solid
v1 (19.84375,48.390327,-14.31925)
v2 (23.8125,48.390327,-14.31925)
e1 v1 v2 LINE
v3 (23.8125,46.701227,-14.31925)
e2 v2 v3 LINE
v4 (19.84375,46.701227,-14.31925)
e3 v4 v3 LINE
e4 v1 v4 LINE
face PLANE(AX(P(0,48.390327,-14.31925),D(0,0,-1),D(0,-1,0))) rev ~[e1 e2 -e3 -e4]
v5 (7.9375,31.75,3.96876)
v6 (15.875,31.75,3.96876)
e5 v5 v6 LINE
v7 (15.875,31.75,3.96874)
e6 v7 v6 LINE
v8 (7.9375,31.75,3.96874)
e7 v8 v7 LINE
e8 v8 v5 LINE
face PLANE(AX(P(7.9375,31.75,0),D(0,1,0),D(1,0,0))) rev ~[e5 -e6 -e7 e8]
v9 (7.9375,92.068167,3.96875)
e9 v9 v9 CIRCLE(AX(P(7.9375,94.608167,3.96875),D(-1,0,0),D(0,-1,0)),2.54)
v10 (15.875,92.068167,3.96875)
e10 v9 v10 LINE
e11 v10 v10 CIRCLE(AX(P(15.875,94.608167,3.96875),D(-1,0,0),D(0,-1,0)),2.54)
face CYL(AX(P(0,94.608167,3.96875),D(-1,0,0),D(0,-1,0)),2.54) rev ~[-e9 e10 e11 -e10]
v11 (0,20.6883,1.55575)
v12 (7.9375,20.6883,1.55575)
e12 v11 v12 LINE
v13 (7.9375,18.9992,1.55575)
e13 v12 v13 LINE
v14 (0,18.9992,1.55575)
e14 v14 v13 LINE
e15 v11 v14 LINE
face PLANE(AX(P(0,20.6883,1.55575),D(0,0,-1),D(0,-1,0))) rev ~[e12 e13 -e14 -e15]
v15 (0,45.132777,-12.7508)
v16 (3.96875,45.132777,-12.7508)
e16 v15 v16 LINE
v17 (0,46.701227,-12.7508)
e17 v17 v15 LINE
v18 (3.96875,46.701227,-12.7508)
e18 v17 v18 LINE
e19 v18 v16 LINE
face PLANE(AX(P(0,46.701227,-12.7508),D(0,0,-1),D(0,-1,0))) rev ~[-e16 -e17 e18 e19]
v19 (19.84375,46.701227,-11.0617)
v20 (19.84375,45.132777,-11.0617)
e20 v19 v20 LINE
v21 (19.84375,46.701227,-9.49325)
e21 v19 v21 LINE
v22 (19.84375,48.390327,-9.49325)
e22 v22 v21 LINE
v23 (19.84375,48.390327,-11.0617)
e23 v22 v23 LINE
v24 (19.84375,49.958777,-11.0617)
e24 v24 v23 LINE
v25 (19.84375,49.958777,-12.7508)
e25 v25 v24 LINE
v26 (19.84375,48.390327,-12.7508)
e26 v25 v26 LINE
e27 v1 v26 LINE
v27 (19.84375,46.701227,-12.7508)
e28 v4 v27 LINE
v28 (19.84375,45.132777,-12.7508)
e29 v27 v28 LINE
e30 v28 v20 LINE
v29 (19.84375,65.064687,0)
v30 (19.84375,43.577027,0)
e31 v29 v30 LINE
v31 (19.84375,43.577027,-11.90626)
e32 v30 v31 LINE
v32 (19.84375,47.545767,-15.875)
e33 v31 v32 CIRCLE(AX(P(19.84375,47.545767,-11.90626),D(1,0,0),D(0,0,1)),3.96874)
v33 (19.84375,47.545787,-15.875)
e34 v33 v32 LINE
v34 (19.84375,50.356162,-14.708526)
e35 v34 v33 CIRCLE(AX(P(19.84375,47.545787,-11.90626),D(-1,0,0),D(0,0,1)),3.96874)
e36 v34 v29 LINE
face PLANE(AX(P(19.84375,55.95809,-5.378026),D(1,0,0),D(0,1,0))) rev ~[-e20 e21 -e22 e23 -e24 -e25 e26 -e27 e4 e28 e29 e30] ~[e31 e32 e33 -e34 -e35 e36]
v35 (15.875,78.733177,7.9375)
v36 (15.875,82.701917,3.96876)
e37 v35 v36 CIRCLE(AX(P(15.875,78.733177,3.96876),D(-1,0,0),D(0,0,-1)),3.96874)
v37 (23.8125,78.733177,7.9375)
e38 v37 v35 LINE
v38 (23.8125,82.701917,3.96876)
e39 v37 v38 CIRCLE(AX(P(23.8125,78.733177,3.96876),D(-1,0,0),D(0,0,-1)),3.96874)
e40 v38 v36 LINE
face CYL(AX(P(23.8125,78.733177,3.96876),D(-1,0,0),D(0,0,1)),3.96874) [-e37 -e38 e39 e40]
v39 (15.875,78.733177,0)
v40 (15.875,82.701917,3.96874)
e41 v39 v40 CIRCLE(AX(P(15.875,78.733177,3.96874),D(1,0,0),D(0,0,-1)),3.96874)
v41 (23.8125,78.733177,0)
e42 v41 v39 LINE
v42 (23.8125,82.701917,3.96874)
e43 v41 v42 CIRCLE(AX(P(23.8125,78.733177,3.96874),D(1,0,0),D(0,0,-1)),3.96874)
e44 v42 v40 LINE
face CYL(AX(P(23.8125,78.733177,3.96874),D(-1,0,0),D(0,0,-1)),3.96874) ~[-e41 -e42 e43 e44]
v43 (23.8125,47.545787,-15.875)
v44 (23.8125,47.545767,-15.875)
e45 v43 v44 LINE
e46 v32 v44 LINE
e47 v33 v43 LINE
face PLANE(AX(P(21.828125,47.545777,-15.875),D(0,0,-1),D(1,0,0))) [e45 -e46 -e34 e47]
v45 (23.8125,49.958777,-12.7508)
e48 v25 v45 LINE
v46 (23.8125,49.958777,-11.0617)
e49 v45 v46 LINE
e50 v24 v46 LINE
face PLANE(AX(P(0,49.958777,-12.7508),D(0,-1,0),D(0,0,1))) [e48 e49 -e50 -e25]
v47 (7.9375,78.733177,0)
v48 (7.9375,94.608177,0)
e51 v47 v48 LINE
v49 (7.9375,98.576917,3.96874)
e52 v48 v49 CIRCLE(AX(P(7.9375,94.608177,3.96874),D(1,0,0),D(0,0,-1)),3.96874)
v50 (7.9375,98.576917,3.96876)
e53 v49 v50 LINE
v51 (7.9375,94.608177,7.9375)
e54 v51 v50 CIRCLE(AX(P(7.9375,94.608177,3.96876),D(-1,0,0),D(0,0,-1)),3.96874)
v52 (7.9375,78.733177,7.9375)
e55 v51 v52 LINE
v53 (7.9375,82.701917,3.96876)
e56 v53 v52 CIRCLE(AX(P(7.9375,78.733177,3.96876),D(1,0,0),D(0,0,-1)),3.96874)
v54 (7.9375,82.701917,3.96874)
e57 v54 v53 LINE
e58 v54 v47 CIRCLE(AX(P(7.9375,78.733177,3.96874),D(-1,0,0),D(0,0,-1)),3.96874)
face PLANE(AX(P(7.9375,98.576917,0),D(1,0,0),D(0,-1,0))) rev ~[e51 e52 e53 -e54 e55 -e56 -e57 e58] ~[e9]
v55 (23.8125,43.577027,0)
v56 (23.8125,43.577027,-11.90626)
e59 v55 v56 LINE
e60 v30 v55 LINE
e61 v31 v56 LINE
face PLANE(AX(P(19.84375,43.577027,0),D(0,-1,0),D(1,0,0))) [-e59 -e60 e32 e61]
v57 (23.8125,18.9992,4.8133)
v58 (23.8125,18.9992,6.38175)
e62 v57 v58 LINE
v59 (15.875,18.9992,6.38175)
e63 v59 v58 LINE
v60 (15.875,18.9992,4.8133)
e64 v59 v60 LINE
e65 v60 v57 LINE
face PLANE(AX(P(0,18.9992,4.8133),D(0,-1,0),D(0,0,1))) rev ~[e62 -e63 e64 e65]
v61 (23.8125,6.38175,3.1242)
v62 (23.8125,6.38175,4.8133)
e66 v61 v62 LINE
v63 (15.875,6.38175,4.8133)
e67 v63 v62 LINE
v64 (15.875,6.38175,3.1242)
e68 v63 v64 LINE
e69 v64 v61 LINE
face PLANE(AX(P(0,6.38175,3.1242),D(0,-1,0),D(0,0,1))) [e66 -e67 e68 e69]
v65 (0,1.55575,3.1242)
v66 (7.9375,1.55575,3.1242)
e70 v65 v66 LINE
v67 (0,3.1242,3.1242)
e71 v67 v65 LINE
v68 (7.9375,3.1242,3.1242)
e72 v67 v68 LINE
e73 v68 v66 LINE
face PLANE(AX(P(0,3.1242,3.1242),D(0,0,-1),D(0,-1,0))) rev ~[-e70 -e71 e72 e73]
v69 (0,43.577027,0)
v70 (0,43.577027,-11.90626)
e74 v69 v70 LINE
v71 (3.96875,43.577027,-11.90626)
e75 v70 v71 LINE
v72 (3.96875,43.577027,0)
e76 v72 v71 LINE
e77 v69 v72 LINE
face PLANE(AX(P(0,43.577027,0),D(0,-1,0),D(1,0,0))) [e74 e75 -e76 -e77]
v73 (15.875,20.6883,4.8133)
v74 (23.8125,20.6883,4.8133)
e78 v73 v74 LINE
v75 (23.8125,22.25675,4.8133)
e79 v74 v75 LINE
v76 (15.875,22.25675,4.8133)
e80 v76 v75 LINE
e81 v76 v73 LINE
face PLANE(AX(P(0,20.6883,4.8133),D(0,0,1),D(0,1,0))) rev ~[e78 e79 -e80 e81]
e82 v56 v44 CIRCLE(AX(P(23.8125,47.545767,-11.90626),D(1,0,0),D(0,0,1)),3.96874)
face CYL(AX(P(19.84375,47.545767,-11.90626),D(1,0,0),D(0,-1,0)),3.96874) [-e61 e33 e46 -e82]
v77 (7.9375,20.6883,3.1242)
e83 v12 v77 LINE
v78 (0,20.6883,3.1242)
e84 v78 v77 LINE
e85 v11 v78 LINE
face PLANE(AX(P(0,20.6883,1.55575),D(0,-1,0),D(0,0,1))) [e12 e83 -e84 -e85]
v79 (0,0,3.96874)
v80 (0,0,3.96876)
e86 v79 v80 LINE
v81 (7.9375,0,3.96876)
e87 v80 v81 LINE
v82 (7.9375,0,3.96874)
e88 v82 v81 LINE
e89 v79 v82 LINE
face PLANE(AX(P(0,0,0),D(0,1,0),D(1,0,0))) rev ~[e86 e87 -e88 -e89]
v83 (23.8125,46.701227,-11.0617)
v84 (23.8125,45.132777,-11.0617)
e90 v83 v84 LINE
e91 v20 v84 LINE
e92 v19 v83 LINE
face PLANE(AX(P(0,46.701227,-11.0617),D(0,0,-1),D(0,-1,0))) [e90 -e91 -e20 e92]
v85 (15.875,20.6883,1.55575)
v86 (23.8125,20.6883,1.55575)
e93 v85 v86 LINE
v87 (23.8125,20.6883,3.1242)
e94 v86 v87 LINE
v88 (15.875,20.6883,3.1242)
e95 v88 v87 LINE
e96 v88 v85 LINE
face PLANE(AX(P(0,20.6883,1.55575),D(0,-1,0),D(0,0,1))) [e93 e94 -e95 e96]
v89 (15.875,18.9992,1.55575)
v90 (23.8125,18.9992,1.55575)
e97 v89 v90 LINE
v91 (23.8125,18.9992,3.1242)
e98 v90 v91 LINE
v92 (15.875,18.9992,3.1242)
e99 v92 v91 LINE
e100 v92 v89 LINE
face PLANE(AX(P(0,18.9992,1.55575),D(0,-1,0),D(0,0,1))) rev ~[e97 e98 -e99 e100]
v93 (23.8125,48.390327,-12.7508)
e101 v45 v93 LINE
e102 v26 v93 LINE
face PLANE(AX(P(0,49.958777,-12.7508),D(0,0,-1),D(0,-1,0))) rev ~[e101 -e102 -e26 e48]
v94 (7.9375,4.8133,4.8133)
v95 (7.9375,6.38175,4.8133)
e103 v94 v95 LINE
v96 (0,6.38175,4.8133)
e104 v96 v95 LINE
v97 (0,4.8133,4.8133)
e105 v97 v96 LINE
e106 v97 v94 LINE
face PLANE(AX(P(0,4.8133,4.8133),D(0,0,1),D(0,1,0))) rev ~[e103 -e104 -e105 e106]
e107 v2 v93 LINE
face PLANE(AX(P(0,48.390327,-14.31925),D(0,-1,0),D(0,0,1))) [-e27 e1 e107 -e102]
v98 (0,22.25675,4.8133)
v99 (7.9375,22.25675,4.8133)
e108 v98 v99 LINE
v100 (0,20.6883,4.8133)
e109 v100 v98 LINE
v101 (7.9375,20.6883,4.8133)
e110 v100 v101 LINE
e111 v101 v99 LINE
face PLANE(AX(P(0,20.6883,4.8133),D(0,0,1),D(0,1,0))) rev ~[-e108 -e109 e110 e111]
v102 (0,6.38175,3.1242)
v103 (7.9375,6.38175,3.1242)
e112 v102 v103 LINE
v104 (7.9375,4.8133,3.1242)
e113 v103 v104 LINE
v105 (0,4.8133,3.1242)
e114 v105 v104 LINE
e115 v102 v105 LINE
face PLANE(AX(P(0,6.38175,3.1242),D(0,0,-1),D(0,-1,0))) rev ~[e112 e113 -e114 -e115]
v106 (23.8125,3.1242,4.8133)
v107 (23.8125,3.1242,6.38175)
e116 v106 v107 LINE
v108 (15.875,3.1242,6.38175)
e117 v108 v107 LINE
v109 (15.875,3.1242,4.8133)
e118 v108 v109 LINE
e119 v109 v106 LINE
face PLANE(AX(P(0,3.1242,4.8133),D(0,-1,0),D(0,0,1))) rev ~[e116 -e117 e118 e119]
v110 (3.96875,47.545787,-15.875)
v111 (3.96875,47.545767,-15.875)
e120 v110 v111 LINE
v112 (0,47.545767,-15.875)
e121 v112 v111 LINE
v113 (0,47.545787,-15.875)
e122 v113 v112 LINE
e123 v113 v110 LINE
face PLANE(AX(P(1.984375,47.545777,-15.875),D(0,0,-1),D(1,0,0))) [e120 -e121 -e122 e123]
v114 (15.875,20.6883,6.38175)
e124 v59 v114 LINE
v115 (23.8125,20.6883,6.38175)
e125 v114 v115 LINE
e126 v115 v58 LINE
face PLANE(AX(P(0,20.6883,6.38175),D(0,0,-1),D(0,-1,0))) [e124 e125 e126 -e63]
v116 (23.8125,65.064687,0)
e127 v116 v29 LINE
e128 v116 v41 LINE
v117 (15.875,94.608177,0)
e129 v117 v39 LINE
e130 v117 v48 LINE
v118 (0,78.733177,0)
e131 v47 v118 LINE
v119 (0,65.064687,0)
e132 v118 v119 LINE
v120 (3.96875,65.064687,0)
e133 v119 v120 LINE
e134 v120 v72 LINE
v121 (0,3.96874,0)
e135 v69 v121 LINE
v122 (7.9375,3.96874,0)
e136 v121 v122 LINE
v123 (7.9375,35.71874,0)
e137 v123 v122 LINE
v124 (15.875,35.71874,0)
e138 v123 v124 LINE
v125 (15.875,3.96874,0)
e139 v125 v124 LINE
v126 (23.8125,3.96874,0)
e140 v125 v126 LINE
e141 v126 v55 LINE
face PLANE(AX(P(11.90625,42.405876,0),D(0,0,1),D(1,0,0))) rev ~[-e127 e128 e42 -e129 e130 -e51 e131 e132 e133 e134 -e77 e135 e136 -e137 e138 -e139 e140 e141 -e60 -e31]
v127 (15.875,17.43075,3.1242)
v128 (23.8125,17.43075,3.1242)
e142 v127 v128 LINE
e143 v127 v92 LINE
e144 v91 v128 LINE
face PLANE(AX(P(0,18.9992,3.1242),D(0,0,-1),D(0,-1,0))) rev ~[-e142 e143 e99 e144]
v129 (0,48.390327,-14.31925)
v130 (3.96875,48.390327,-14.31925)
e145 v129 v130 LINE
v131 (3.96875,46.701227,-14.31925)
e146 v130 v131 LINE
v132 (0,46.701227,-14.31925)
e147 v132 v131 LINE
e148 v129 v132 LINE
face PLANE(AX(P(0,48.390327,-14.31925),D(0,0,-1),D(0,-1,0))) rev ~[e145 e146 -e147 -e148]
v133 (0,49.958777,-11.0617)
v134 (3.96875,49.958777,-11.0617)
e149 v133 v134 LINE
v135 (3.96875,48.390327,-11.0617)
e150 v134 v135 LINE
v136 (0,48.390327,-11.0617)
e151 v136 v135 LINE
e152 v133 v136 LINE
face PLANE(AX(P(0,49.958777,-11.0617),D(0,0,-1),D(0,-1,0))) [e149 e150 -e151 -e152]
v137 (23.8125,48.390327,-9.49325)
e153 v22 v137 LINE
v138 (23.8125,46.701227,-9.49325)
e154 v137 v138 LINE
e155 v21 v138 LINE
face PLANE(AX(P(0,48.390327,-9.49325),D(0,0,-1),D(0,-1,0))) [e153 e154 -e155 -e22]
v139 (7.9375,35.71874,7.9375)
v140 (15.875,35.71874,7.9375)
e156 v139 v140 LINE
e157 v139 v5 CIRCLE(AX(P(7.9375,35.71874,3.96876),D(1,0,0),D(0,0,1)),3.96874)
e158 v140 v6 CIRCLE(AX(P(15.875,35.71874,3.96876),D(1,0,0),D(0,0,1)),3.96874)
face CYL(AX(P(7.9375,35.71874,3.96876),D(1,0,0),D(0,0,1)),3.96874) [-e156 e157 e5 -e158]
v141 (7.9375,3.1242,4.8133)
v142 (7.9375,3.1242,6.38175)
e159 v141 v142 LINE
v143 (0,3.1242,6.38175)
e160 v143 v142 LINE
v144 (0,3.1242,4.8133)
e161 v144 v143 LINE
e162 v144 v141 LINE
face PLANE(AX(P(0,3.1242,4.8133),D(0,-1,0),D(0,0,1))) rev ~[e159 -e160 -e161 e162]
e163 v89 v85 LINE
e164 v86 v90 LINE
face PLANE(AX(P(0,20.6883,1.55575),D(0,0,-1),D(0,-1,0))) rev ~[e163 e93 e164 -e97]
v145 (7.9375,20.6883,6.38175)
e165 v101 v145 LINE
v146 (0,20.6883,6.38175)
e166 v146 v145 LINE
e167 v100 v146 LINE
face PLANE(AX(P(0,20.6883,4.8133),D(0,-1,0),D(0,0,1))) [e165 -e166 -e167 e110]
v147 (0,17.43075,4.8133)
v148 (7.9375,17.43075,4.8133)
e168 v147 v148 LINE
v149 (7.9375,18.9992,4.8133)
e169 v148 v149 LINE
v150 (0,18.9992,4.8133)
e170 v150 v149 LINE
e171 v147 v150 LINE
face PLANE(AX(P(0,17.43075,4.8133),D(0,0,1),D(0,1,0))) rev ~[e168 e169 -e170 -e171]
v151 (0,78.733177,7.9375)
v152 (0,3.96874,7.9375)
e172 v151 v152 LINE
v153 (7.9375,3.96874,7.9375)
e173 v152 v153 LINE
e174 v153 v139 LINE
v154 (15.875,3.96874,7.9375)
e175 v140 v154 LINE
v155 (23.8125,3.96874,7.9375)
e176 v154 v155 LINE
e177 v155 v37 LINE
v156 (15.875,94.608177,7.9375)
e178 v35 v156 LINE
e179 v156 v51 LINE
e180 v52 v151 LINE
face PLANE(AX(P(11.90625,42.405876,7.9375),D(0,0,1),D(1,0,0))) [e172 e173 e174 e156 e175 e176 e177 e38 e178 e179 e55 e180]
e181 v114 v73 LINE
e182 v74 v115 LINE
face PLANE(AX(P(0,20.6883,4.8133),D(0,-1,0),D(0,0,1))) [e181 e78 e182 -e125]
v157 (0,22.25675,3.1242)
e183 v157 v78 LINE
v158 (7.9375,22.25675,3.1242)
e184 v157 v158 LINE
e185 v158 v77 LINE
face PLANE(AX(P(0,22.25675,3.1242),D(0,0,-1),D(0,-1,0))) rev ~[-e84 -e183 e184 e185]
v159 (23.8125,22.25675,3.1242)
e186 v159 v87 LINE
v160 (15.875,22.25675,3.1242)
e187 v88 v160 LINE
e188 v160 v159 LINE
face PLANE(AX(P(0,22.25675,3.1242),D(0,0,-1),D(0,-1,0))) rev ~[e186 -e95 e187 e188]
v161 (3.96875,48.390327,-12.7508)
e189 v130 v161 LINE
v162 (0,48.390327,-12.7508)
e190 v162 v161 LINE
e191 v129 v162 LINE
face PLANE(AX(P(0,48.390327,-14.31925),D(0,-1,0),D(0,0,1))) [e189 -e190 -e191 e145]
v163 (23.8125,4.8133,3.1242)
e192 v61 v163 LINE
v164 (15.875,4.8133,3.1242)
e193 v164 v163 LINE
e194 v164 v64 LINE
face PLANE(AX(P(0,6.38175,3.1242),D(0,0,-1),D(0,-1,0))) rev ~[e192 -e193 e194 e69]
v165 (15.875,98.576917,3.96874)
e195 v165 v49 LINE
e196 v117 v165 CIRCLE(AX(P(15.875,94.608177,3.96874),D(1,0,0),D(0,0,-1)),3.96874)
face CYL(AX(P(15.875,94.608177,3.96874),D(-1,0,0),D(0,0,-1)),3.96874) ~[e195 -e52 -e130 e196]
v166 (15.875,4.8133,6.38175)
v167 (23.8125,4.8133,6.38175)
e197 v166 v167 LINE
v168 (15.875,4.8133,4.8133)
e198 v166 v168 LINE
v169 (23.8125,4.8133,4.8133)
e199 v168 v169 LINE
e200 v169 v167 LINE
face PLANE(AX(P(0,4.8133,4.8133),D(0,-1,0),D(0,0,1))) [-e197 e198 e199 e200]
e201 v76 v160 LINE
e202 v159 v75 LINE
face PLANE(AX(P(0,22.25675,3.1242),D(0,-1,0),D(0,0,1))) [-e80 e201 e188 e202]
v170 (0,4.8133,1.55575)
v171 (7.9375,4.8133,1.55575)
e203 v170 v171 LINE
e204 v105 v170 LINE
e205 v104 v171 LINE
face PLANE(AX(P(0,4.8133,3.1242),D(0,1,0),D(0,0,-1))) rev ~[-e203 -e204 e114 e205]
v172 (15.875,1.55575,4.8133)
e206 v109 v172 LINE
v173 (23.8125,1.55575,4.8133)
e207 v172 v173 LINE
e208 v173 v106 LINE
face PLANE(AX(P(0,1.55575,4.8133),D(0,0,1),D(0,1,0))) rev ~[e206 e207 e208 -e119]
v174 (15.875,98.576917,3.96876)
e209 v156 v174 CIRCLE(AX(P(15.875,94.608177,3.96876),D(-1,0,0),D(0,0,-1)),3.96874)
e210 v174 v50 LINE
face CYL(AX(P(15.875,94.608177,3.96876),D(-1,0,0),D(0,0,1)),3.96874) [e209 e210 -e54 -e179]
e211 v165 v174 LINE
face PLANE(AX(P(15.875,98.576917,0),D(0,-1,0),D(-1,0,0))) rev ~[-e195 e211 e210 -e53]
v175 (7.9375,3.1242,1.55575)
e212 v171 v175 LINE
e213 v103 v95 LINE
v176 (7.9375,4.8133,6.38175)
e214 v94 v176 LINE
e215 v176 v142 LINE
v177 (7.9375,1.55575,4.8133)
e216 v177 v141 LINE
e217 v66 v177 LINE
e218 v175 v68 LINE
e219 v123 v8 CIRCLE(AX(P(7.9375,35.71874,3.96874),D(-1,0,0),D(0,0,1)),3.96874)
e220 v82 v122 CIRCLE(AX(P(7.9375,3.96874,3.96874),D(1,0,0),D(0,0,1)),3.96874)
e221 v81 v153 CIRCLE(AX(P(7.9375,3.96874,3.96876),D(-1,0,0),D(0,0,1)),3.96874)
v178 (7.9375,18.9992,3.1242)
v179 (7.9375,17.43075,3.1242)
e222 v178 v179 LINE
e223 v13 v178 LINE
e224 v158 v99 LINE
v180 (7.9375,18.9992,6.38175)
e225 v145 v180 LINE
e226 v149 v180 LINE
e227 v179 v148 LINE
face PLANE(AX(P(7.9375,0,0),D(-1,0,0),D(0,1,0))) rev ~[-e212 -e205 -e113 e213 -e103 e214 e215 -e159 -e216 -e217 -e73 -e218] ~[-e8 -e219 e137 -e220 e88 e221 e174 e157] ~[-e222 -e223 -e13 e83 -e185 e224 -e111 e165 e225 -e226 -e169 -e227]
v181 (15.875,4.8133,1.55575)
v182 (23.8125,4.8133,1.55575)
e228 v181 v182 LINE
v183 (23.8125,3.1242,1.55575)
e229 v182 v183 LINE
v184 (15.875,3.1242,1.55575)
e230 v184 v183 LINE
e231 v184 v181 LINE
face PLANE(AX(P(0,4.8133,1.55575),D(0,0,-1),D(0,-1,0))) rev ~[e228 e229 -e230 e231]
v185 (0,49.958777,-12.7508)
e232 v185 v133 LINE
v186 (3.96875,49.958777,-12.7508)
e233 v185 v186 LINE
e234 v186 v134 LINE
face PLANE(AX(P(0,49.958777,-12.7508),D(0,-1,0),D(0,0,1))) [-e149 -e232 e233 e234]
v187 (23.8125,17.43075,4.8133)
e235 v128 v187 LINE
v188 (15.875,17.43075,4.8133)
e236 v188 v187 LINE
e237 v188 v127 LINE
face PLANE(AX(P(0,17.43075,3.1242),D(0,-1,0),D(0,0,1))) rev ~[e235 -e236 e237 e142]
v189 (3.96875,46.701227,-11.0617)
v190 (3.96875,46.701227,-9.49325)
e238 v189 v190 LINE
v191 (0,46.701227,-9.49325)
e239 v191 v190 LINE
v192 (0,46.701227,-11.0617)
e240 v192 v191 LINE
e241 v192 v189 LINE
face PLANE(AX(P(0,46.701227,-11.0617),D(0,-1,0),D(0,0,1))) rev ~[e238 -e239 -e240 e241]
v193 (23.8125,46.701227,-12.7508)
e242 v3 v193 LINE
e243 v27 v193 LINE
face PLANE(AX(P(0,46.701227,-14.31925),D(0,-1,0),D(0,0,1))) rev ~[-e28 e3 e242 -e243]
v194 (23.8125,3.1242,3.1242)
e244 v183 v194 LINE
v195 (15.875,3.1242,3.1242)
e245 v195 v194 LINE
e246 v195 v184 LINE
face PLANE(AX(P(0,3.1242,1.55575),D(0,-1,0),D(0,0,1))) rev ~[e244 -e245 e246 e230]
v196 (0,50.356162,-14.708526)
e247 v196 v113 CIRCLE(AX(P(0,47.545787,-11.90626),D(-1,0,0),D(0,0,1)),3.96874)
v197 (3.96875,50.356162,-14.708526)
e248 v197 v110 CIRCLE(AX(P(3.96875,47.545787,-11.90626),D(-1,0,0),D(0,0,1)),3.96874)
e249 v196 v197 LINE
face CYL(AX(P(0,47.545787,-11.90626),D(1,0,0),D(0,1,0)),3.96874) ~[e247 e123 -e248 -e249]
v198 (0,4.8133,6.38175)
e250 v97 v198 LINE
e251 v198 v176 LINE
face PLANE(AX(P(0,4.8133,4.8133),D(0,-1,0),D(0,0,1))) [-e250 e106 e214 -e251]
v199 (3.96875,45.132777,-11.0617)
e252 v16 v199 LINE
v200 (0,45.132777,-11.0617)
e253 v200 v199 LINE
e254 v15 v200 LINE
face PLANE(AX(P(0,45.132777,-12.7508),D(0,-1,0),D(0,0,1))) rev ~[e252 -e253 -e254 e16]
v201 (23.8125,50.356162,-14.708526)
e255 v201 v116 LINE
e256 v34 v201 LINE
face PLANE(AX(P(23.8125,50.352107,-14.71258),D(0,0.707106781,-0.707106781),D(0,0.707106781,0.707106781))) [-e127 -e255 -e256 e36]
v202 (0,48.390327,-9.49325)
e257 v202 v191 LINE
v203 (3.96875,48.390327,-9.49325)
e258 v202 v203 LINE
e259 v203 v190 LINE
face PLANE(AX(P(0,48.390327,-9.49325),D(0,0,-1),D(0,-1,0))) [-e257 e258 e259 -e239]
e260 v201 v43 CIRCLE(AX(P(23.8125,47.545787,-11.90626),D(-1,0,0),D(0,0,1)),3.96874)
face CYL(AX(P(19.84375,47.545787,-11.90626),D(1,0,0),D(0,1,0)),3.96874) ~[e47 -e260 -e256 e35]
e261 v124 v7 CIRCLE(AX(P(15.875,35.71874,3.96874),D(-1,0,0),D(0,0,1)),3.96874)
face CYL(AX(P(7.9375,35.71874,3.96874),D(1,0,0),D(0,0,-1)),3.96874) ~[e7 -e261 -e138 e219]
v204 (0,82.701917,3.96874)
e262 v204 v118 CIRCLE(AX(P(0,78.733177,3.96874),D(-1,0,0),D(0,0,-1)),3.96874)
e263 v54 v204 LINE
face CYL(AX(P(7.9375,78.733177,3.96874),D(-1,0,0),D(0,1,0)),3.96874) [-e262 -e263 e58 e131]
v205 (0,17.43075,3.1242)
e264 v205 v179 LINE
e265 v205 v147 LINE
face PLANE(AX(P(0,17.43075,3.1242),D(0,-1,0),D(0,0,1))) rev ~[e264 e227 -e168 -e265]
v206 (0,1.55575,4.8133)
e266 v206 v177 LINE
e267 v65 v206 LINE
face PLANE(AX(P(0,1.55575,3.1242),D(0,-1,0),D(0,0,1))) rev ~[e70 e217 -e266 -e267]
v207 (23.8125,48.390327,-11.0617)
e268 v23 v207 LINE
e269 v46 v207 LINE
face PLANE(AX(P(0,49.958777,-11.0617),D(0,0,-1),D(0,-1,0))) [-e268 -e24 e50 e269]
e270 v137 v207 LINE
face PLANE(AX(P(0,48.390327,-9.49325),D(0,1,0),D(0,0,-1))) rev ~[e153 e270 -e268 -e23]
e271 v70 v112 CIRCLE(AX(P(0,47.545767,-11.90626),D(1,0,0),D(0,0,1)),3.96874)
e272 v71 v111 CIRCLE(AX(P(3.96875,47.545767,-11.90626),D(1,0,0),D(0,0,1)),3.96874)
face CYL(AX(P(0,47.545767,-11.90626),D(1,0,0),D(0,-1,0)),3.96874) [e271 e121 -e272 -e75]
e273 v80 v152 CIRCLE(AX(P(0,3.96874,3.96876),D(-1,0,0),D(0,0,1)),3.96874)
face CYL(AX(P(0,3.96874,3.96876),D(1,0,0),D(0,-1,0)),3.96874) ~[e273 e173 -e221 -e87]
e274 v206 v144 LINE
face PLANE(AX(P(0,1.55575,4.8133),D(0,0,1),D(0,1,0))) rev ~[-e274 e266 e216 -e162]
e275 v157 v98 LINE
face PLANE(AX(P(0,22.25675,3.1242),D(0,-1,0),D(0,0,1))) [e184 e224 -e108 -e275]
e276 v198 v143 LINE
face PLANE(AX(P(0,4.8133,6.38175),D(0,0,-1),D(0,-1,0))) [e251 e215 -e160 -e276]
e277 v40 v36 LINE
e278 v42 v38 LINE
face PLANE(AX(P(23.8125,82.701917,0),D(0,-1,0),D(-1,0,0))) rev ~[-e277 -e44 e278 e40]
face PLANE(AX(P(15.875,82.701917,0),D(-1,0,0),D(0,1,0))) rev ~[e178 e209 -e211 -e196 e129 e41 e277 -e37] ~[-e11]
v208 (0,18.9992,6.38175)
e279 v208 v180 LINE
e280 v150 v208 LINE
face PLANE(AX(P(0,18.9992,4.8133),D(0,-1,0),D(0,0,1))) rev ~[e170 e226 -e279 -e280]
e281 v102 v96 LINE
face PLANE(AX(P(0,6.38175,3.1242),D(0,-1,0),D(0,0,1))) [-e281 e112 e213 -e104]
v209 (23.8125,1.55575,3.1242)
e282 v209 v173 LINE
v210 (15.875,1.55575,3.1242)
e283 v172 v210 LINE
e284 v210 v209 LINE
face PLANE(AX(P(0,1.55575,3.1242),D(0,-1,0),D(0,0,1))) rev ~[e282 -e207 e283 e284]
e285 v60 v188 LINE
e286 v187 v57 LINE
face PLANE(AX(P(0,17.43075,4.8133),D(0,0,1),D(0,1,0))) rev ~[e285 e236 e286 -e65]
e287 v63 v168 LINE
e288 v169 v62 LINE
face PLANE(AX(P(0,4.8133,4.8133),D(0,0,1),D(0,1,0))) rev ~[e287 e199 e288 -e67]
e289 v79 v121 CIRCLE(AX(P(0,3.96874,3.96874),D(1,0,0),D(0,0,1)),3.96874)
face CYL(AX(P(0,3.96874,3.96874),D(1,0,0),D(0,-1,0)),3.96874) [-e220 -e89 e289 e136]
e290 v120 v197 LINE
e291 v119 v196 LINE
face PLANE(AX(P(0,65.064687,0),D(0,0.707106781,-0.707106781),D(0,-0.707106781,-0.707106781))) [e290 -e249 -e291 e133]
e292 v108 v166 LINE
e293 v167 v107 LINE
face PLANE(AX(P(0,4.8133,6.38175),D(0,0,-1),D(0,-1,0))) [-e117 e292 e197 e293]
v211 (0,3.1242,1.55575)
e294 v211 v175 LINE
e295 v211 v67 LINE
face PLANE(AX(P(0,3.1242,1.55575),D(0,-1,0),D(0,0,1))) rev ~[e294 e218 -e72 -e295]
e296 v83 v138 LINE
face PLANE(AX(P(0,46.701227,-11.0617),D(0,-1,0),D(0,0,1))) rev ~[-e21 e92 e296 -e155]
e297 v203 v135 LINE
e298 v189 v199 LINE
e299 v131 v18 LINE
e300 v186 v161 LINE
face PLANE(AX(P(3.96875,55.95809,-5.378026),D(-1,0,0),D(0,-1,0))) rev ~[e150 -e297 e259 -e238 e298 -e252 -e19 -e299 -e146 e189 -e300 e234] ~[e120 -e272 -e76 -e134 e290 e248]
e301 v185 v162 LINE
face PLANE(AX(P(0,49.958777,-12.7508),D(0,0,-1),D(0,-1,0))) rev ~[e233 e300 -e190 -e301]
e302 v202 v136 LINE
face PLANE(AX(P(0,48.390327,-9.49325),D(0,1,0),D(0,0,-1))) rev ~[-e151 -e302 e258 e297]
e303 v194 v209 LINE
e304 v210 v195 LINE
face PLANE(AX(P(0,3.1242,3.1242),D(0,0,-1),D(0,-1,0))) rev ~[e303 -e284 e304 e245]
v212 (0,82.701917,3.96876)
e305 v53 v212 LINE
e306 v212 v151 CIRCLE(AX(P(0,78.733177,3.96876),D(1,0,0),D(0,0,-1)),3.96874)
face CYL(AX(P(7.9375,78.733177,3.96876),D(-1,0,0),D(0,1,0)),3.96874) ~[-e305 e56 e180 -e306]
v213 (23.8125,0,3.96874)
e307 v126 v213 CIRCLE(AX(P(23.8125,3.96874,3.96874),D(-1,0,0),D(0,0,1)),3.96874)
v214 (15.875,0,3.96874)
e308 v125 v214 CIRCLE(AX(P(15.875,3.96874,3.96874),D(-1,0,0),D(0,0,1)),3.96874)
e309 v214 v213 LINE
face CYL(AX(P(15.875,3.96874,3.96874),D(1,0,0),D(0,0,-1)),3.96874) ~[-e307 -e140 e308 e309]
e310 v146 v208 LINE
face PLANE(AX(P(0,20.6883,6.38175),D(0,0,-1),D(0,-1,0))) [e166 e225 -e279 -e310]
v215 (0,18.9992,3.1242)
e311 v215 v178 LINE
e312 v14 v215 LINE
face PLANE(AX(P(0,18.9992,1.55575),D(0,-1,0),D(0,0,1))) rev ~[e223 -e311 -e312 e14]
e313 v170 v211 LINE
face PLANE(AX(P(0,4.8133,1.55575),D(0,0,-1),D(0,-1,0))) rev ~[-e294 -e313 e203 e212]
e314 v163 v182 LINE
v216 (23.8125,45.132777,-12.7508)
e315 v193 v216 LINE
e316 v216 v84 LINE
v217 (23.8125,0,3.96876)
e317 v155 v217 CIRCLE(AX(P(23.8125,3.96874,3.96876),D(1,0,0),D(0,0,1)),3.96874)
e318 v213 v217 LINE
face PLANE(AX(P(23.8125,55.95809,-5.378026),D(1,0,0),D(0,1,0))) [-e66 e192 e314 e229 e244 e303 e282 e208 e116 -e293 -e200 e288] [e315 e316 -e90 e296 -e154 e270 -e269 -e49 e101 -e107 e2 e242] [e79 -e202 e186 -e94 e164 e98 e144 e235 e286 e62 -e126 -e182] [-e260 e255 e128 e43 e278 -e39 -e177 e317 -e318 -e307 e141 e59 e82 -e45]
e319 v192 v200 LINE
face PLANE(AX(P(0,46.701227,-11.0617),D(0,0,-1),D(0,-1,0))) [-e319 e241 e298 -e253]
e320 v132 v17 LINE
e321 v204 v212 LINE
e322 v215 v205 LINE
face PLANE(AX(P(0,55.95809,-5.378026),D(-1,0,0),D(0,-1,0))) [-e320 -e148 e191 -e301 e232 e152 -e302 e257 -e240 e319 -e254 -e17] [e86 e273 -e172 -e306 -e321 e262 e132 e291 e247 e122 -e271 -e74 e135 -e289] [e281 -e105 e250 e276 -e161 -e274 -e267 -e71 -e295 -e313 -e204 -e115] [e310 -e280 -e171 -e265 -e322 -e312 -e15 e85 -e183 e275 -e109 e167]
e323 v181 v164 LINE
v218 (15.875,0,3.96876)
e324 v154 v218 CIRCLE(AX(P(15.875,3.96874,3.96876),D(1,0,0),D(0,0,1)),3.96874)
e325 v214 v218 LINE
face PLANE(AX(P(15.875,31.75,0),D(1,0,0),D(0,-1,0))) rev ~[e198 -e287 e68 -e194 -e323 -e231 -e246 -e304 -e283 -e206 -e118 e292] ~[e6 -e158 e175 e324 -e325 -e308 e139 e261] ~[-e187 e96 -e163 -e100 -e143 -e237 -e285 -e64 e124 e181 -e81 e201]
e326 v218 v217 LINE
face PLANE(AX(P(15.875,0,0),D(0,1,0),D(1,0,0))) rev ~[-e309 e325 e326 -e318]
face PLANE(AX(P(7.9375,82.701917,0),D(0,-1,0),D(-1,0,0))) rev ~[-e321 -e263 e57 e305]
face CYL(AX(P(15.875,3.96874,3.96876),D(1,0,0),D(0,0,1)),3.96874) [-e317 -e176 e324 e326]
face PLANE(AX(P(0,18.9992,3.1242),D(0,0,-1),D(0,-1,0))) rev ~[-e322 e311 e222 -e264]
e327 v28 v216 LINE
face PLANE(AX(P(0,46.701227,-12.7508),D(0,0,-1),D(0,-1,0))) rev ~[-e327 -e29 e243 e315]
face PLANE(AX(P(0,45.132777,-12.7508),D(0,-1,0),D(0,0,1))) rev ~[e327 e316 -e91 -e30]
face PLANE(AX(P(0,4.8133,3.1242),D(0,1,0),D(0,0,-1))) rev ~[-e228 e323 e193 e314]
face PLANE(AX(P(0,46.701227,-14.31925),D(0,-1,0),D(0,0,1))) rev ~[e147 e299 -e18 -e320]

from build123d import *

# Parameters (mm, degrees)
F1_DEPTH  = 7.9375
F2_W      = 3.96875
F2_H      = 7.9375
F3_DEPTH  = 15.875
F4_R      = 3.96874
F5_W      = 1.56845
F5_H      = 1.6891
F5_W_2    = 1.6891
F5_H_2    = 1.56845
F5_R      = 2.54
F6_DEPTH  = 23.8125
F8_DEPTH  = 3.96875
F10_DEPTH = 3.96875


# Not quite as in the source:
# - a fillet or chamfer is up to 0.001 mm smaller than in the source, because OpenCascade refuses the exact size


with BuildPart() as f1:
    # F0 (on Top) → F1 (new body)
    with BuildSketch(Plane.XY):
        Polygon((0, 82.7019174), (0, 0), (7.9375, 0), (7.9375, 31.75), (15.875, 31.75), (15.875, 0), (23.8125, 0), (23.8125, 82.7019174), (15.875, 82.7019174), (15.875, 98.5769174), (7.9375, 98.5769174), (7.9375, 82.7019174), align=None)
    extrude(amount=F1_DEPTH)

    # F2 (on face) → F3 (join)
    with BuildSketch(Plane(origin=(0, 0, 0), x_dir=(1, 0, 0), z_dir=(0, 0, -1))):
        with Locations((21.828125, -47.5457774)):
            Rectangle(F2_W, F2_H)
        with Locations((1.984375, -47.5457774)):
            Rectangle(F2_W, F2_H)
    extrude(amount=F3_DEPTH)

    # F4 (radius 3.96875 in the source; OpenCascade refuses exactly that, so slightly less here)
    f4_edges = [f1.edges().sort_by_distance(p)[0] for p in [
        (19.84375, 82.701917, 0),
        (19.84375, 82.701917, 7.9375),
        (11.90625, 98.576917, 0),
        (11.90625, 98.576917, 7.9375),
        (3.96875, 82.701917, 0),
        (3.96875, 82.701917, 7.9375),
        (1.984375, 51.514527, -15.875),
        (1.984375, 43.577027, -15.875),
        (21.828125, 51.514527, -15.875),
        (21.828125, 43.577027, -15.875),
        (3.96875, 0, 0),
        (3.96875, 0, 7.9375),
        (19.84375, 0, 7.9375),
        (19.84375, 0, 0),
        (11.90625, 31.75, 7.9375),
        (11.90625, 31.75, 0),
    ]]
    fillet(f4_edges, radius=F4_R)

    # F5 (on face) → F6 (cut, through all)
    with BuildSketch(Plane(origin=(0, 0, 0), x_dir=(0, -1, 0), z_dir=(-1, 0, 0))):
        with Locations((-2.339975, 3.96875)):
            Rectangle(F5_W, F5_H)
        with Locations((-3.96875, 2.339975)):
            Rectangle(F5_W_2, F5_H_2)
        with Locations((-3.96875, 3.96875)):
            Rectangle(F5_W_2, F5_H)
        with Locations((-5.597525, 3.96875)):
            Rectangle(F5_W, F5_H)
        with Locations((-3.96875, 5.597525)):
            Rectangle(F5_W_2, F5_H_2)
        with Locations((-47.5457774, -10.277475)):
            Rectangle(F5_W_2, F5_H_2)
        with Locations((-47.5457774, -11.90625)):
            Rectangle(F5_W_2, F5_H)
        with Locations((-49.1745524, -11.90625)):
            Rectangle(F5_W, F5_H)
        with Locations((-45.9170024, -11.90625)):
            Rectangle(F5_W, F5_H)
        with Locations((-47.5457774, -13.535025)):
            Rectangle(F5_W_2, F5_H_2)
        with Locations((-19.84375, 2.339975)):
            Rectangle(F5_W_2, F5_H_2)
        with Locations((-21.472525, 3.96875)):
            Rectangle(F5_W, F5_H)
        with Locations((-19.84375, 3.96875)):
            Rectangle(F5_W_2, F5_H)
        with Locations((-18.214975, 3.96875)):
            Rectangle(F5_W, F5_H)
        with Locations((-19.84375, 5.597525)):
            Rectangle(F5_W_2, F5_H_2)
        with Locations((-94.6081674, 3.96875)):
            Circle(F5_R)
    extrude(amount=-F6_DEPTH, mode=Mode.SUBTRACT)

    # F7 (on face) → F8 (join, through all)
    with BuildSketch(Plane(origin=(0, 0, 0), x_dir=(0, -1, 0), z_dir=(-1, 0, 0))):
        with BuildLine():
            Line((-65.0646874757, 0), (-50.3521074378, -14.7125800378))
            ThreePointArc((-50.3521074378, -14.7125800378), (-51.2124242947, -13.4250248722), (-51.5145274, -11.90625))
            Line((-51.5145274, -11.90625), (-51.5145274, 0))
            Line((-51.5145274, 0), (-65.0646874757, 0))
        make_face()
    extrude(amount=-F8_DEPTH)

    # F9 (on face) → F10 (join, through all)
    with BuildSketch(Plane.YZ.offset(23.8125)):
        with BuildLine():
            ThreePointArc((51.5145274, -11.90625), (51.2124242947, -13.4250248722), (50.3521074378, -14.7125800378))
            Line((50.3521074378, -14.7125800378), (65.0646874757, 0))
            Line((65.0646874757, 0), (51.5145274, 0))
            Line((51.5145274, 0), (51.5145274, -11.90625))
        make_face()
    extrude(amount=-F10_DEPTH)


solid = f1.part
